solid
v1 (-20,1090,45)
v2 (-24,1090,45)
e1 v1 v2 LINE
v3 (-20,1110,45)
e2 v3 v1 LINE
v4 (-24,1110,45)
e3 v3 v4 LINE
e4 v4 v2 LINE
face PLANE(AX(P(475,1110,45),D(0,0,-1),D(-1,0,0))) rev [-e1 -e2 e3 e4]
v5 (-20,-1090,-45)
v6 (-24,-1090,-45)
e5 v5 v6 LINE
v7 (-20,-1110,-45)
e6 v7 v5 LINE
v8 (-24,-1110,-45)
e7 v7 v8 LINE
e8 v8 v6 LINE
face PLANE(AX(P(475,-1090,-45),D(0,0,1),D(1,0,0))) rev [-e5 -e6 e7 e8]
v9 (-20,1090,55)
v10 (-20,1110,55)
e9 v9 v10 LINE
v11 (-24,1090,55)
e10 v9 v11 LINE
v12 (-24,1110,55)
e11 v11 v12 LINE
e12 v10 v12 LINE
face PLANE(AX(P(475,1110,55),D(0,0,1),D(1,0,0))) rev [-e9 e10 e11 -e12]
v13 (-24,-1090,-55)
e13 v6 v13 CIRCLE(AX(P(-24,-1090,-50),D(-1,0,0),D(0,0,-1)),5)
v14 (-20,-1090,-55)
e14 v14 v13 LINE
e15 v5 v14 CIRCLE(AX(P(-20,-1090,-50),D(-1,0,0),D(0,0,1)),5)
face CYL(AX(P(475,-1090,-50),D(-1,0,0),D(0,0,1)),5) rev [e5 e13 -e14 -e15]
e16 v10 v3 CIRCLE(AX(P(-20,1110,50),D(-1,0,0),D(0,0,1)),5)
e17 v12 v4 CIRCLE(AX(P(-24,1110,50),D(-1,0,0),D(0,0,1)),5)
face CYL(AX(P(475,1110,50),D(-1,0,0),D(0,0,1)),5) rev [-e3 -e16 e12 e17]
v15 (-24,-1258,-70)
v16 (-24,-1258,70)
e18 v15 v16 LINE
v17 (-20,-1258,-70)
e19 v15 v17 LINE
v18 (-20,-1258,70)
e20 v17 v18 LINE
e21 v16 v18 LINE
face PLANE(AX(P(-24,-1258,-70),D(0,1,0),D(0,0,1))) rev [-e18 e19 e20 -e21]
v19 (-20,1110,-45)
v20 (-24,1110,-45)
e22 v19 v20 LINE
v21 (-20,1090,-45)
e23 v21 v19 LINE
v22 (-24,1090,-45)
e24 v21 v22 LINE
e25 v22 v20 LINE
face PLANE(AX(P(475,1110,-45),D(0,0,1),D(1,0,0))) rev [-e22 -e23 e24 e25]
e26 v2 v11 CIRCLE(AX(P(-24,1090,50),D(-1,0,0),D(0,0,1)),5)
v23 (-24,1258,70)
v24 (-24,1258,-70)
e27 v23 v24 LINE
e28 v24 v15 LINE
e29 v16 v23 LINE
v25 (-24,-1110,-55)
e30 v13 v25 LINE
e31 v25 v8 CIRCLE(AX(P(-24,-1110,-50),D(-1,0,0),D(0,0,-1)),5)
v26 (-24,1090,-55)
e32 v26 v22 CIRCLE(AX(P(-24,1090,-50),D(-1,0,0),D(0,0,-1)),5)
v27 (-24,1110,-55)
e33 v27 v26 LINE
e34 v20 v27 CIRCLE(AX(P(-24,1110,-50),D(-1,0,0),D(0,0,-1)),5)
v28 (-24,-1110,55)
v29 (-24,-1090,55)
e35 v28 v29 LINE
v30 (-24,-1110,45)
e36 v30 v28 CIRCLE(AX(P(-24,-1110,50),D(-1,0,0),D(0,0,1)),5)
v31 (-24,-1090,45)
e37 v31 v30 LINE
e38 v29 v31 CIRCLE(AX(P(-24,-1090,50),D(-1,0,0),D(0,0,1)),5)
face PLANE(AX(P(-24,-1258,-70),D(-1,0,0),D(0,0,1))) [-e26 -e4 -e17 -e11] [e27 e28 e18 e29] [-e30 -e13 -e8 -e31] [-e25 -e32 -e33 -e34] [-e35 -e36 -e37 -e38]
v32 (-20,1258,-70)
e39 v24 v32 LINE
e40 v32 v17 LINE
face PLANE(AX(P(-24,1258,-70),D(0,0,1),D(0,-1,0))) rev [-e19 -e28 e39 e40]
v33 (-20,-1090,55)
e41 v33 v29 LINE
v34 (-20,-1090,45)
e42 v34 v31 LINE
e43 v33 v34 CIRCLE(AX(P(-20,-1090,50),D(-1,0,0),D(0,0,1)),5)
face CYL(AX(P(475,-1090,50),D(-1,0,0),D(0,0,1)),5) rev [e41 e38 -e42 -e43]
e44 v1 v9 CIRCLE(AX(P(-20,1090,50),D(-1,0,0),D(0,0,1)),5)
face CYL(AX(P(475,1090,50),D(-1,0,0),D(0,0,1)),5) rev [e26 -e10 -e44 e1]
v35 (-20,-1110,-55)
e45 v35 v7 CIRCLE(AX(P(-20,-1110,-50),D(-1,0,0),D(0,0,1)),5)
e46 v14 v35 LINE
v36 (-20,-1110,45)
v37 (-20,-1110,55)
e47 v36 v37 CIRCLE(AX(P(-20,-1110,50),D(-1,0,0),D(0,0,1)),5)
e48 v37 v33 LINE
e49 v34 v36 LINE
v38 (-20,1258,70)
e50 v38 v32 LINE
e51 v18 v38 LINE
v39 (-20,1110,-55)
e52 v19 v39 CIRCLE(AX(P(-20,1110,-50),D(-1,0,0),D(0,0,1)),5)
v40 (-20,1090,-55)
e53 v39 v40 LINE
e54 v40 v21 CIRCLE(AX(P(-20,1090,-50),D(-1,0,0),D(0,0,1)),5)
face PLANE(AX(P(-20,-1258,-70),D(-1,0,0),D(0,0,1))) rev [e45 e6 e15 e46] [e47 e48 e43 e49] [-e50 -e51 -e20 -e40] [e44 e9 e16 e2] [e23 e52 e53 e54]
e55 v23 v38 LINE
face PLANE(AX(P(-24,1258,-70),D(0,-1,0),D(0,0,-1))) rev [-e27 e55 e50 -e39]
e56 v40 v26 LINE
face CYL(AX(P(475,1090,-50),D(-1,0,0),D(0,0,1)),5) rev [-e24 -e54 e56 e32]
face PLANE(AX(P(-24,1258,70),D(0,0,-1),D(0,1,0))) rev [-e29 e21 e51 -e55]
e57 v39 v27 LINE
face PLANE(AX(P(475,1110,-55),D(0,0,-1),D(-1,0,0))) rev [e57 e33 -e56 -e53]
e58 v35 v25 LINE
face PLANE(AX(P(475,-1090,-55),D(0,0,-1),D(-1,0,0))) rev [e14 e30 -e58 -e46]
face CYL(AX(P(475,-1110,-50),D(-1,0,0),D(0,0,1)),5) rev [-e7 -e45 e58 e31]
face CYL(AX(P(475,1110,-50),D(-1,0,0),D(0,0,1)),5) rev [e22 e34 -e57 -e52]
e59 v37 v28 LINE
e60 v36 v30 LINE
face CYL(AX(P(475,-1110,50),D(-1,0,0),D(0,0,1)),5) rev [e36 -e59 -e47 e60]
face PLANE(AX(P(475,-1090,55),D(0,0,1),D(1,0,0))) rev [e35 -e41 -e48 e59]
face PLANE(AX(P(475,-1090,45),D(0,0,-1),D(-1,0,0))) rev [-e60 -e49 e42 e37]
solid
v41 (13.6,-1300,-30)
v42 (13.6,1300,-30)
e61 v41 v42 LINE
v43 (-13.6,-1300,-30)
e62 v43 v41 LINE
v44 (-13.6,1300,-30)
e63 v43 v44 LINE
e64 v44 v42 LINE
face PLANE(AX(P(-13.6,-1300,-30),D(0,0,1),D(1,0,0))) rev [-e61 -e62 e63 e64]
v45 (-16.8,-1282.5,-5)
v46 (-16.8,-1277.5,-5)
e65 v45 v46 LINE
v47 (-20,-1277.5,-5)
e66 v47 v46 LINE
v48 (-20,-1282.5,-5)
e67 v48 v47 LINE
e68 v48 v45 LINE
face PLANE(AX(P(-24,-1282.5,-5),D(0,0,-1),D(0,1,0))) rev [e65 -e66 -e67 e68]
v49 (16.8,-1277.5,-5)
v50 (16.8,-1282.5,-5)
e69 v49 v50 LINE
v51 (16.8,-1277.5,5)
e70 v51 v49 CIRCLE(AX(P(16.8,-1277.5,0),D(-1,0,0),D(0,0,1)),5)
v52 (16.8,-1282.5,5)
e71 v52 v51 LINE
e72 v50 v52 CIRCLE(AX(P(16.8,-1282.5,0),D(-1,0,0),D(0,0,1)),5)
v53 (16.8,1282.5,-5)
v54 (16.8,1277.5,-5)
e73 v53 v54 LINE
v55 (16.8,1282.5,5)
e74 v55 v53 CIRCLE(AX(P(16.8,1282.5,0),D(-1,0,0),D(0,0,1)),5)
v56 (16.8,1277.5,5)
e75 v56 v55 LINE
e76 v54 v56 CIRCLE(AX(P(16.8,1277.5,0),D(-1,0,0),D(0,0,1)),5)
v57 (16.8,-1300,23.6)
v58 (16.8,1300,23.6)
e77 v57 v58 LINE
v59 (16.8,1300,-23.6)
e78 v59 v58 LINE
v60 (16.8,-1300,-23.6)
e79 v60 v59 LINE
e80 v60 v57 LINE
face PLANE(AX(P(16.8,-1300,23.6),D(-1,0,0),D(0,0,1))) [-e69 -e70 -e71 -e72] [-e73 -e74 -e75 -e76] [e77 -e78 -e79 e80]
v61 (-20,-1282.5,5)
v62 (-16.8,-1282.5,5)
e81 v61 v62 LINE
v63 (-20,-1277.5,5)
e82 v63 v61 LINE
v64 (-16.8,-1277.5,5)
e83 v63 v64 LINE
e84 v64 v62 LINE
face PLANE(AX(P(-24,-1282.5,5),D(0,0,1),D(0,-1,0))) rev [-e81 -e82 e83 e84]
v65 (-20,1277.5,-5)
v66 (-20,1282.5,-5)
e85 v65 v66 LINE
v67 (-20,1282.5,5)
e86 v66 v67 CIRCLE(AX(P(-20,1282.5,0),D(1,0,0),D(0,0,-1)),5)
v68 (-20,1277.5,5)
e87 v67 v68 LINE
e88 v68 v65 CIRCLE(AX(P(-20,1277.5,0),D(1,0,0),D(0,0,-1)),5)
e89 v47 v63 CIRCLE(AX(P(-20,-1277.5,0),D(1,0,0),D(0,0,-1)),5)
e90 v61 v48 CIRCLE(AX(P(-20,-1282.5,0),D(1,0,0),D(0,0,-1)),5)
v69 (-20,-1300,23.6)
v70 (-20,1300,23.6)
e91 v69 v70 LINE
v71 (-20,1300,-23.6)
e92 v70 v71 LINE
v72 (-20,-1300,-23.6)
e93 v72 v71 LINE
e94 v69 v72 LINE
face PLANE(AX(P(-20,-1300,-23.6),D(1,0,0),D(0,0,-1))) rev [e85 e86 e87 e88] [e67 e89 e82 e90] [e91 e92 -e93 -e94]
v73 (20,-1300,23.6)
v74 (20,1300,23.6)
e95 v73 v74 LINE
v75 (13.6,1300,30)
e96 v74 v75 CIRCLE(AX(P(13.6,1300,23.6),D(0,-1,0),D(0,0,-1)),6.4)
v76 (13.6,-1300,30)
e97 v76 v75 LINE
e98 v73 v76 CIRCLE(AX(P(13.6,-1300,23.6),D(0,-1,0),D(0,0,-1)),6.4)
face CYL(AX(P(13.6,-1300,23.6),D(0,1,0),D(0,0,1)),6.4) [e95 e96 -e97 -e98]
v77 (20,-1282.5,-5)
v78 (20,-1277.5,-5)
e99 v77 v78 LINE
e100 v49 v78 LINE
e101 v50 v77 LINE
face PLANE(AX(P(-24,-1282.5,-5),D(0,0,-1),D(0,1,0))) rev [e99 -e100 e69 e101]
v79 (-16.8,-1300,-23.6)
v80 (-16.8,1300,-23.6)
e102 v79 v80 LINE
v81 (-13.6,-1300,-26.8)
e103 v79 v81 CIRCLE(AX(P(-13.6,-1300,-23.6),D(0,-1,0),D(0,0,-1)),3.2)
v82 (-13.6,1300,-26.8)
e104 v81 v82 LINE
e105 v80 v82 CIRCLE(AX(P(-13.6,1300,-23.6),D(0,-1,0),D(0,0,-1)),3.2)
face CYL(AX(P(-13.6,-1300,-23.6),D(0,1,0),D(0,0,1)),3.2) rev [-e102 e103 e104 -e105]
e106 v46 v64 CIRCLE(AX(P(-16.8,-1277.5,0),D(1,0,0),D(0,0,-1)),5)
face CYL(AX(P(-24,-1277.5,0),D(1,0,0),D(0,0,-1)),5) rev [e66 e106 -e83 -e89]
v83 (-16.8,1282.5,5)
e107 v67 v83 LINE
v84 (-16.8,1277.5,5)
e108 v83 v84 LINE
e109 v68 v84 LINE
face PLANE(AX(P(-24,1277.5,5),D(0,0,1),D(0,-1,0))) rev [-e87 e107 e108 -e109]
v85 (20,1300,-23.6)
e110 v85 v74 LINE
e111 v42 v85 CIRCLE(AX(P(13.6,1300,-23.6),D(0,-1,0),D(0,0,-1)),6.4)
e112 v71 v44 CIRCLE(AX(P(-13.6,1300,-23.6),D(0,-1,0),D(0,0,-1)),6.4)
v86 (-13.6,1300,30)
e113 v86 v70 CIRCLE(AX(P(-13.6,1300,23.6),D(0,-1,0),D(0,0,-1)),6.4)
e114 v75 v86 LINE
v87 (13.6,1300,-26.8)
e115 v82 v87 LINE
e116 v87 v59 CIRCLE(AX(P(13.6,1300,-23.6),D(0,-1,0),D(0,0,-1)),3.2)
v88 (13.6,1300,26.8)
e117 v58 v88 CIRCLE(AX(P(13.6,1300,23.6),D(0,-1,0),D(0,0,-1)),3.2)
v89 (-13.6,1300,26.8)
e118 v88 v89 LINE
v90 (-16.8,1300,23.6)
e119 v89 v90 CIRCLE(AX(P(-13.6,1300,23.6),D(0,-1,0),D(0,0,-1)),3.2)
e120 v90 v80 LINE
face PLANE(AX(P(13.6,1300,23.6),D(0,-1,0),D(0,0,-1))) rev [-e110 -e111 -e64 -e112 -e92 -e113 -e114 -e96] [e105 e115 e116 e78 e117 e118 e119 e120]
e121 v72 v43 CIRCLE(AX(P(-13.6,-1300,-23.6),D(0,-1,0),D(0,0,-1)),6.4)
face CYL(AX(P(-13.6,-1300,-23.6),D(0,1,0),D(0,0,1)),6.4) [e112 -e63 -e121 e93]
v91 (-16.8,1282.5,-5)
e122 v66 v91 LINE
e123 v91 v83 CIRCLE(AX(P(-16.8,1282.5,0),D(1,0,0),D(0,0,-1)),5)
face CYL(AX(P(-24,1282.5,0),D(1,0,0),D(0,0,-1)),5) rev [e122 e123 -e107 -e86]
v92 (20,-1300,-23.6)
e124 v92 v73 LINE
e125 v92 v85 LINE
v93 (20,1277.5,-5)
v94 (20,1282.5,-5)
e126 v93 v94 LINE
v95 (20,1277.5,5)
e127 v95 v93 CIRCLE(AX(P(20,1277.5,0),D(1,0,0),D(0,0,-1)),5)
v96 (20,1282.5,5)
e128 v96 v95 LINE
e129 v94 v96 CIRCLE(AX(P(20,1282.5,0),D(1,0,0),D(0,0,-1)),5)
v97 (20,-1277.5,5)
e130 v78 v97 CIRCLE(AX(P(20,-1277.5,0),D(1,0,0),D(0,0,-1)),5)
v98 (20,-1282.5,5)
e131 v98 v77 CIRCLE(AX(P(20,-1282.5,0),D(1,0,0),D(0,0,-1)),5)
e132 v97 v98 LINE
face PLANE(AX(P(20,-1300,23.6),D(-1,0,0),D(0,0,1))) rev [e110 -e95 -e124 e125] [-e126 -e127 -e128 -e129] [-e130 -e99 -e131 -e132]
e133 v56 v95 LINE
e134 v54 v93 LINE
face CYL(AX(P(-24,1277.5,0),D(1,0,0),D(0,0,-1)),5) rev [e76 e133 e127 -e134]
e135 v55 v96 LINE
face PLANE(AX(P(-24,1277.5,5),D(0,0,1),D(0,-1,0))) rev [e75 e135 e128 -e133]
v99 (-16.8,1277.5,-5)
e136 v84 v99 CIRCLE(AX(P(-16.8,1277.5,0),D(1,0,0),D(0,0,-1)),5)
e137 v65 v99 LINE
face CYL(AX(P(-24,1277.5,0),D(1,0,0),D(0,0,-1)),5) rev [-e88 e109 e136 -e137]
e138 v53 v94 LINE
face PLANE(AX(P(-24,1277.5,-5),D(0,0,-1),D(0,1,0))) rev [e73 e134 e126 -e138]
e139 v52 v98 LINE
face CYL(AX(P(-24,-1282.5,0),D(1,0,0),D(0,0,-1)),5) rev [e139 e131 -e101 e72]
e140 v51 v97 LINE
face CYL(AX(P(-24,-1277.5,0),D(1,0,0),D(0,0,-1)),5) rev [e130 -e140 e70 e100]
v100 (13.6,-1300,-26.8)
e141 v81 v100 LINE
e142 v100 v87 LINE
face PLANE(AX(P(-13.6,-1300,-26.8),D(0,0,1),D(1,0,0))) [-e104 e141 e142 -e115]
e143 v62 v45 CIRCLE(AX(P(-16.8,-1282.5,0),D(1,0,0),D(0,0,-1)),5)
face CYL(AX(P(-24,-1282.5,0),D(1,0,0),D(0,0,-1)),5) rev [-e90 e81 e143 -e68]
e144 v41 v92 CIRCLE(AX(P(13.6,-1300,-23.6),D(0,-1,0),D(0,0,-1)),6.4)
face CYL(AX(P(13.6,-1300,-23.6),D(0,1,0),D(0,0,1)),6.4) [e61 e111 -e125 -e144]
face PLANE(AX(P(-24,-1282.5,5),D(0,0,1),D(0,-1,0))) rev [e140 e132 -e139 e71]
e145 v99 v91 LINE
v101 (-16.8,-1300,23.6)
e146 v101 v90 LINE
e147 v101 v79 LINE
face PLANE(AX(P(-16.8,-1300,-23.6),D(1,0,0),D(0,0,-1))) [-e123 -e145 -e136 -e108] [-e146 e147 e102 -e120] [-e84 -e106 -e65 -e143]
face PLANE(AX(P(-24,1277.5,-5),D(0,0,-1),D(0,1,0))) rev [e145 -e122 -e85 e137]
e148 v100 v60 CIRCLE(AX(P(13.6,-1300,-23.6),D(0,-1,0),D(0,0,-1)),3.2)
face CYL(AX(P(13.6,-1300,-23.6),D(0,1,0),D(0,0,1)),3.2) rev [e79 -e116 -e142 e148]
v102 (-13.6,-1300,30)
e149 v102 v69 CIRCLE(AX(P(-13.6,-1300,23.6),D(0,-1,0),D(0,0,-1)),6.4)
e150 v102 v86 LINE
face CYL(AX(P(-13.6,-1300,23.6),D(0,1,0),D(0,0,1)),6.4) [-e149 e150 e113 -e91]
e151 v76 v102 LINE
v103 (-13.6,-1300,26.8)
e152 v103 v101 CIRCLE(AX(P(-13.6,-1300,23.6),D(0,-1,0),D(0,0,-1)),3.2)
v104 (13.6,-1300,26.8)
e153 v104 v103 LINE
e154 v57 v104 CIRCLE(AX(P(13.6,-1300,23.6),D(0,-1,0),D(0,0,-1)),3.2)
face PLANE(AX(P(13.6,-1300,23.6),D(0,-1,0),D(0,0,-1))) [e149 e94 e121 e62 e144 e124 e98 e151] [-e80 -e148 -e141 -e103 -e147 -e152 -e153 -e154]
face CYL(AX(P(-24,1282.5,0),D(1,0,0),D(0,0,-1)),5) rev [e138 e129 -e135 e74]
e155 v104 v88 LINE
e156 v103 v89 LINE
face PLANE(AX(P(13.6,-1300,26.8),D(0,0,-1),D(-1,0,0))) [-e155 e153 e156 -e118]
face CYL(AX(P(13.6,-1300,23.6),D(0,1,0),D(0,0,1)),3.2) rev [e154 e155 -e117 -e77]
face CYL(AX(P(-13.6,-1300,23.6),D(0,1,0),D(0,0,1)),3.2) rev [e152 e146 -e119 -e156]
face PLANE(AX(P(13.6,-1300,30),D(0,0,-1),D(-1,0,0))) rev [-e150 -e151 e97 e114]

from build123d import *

# Parameters (mm, degrees)
MEMBER_1_DEPTH         = 2600
SKETCH_3_W             = 140
SKETCH_3_H             = 2516
SM_BASE_FLANGE_1_DEPTH = 4
CUT_EXTRUDE_1_DEPTH    = 1303.626577343
CUT_EXTRUDE_5_DEPTH    = 499


# Sheet-metal steps are written as plain solids
with BuildPart() as part:
    # Sketch1 → Member 1 (new body)
    with BuildSketch(Plane.XZ.offset(-1300)):
        with BuildLine():
            Line((-13.6, -30), (13.6, -30))
            ThreePointArc((13.6, -30), (18.1254834, -28.1254834), (20, -23.6))
            Line((20, -23.6), (20, 23.6))
            ThreePointArc((20, 23.6), (18.1254834, 28.1254834), (13.6, 30))
            Line((13.6, 30), (-13.6, 30))
            ThreePointArc((-13.6, 30), (-18.1254834, 28.1254834), (-20, 23.6))
            Line((-20, 23.6), (-20, -23.6))
            ThreePointArc((-20, -23.6), (-18.1254834, -28.1254834), (-13.6, -30))
        make_face()
        with BuildLine():
            Line((-13.6, -26.8), (13.6, -26.8))
            ThreePointArc((13.6, -26.8), (15.8627417, -25.8627417), (16.8, -23.6))
            Line((16.8, -23.6), (16.8, 23.6))
            ThreePointArc((16.8, 23.6), (15.8627417, 25.8627417), (13.6, 26.8))
            Line((13.6, 26.8), (-13.6, 26.8))
            ThreePointArc((-13.6, 26.8), (-15.8627417, 25.8627417), (-16.8, 23.6))
            Line((-16.8, 23.6), (-16.8, -23.6))
            ThreePointArc((-16.8, -23.6), (-15.8627417, -25.8627417), (-13.6, -26.8))
        make_face(mode=Mode.SUBTRACT)
    extrude(amount=MEMBER_1_DEPTH)

    # 草图4 → 切除-拉伸1 (cut, through all)
    with BuildSketch(Plane(origin=(20, 0, 0), x_dir=(0, 0, -1), z_dir=(1, 0, 0))):
        with BuildLine():
            Line((-5, -1282.5), (-5, -1277.5))
            ThreePointArc((-5, -1277.5), (0, -1272.5), (5, -1277.5))
            Line((5, -1277.5), (5, -1282.5))
            ThreePointArc((5, -1282.5), (0, -1287.5), (-5, -1282.5))
        make_face()
        with BuildLine():
            Line((-5, 1277.5), (-5, 1282.5))
            ThreePointArc((-5, 1282.5), (0, 1287.5), (5, 1282.5))
            Line((5, 1282.5), (5, 1277.5))
            ThreePointArc((5, 1277.5), (0, 1272.5), (-5, 1277.5))
        make_face()
    extrude(amount=-CUT_EXTRUDE_1_DEPTH, mode=Mode.SUBTRACT)


with BuildPart() as body_2:
    # 草图3 → 基体-法兰1 (new body)
    with BuildSketch(Plane.ZY.offset(20)):
        Rectangle(SKETCH_3_W, SKETCH_3_H)
    extrude(amount=SM_BASE_FLANGE_1_DEPTH)

    # 草图8 → 切除-拉伸5 (cut)
    with BuildSketch(Plane.ZY.offset(24)):
        with BuildLine():
            Line((55, 1110.000000001), (55, 1090.000000001))
            ThreePointArc((55, 1090.000000001), (50, 1085.000000001), (45, 1090.000000001))
            Line((45, 1090.000000001), (45, 1110.000000001))
            ThreePointArc((45, 1110.000000001), (50, 1115.000000001), (55, 1110.000000001))
        make_face()
        with BuildLine():
            Line((55, -1089.999999999), (55, -1109.999999999))
            ThreePointArc((55, -1109.999999999), (50, -1114.999999999), (45, -1109.999999999))
            Line((45, -1109.999999999), (45, -1089.999999999))
            ThreePointArc((45, -1089.999999999), (50, -1084.999999999), (55, -1089.999999999))
        make_face()
        with BuildLine():
            Line((-55, -1089.999999999), (-55, -1109.999999999))
            ThreePointArc((-55, -1109.999999999), (-50, -1114.999999999), (-45, -1109.999999999))
            Line((-45, -1109.999999999), (-45, -1089.999999999))
            ThreePointArc((-45, -1089.999999999), (-50, -1084.999999999), (-55, -1089.999999999))
        make_face()
        with BuildLine():
            Line((-55, 1110.000000001), (-55, 1090.000000001))
            ThreePointArc((-55, 1090.000000001), (-50, 1085.000000001), (-45, 1090.000000001))
            Line((-45, 1090.000000001), (-45, 1110.000000001))
            ThreePointArc((-45, 1110.000000001), (-50, 1115.000000001), (-55, 1110.000000001))
        make_face()
    extrude(amount=-CUT_EXTRUDE_5_DEPTH, mode=Mode.SUBTRACT)


solid = Compound([part.part, body_2.part])
